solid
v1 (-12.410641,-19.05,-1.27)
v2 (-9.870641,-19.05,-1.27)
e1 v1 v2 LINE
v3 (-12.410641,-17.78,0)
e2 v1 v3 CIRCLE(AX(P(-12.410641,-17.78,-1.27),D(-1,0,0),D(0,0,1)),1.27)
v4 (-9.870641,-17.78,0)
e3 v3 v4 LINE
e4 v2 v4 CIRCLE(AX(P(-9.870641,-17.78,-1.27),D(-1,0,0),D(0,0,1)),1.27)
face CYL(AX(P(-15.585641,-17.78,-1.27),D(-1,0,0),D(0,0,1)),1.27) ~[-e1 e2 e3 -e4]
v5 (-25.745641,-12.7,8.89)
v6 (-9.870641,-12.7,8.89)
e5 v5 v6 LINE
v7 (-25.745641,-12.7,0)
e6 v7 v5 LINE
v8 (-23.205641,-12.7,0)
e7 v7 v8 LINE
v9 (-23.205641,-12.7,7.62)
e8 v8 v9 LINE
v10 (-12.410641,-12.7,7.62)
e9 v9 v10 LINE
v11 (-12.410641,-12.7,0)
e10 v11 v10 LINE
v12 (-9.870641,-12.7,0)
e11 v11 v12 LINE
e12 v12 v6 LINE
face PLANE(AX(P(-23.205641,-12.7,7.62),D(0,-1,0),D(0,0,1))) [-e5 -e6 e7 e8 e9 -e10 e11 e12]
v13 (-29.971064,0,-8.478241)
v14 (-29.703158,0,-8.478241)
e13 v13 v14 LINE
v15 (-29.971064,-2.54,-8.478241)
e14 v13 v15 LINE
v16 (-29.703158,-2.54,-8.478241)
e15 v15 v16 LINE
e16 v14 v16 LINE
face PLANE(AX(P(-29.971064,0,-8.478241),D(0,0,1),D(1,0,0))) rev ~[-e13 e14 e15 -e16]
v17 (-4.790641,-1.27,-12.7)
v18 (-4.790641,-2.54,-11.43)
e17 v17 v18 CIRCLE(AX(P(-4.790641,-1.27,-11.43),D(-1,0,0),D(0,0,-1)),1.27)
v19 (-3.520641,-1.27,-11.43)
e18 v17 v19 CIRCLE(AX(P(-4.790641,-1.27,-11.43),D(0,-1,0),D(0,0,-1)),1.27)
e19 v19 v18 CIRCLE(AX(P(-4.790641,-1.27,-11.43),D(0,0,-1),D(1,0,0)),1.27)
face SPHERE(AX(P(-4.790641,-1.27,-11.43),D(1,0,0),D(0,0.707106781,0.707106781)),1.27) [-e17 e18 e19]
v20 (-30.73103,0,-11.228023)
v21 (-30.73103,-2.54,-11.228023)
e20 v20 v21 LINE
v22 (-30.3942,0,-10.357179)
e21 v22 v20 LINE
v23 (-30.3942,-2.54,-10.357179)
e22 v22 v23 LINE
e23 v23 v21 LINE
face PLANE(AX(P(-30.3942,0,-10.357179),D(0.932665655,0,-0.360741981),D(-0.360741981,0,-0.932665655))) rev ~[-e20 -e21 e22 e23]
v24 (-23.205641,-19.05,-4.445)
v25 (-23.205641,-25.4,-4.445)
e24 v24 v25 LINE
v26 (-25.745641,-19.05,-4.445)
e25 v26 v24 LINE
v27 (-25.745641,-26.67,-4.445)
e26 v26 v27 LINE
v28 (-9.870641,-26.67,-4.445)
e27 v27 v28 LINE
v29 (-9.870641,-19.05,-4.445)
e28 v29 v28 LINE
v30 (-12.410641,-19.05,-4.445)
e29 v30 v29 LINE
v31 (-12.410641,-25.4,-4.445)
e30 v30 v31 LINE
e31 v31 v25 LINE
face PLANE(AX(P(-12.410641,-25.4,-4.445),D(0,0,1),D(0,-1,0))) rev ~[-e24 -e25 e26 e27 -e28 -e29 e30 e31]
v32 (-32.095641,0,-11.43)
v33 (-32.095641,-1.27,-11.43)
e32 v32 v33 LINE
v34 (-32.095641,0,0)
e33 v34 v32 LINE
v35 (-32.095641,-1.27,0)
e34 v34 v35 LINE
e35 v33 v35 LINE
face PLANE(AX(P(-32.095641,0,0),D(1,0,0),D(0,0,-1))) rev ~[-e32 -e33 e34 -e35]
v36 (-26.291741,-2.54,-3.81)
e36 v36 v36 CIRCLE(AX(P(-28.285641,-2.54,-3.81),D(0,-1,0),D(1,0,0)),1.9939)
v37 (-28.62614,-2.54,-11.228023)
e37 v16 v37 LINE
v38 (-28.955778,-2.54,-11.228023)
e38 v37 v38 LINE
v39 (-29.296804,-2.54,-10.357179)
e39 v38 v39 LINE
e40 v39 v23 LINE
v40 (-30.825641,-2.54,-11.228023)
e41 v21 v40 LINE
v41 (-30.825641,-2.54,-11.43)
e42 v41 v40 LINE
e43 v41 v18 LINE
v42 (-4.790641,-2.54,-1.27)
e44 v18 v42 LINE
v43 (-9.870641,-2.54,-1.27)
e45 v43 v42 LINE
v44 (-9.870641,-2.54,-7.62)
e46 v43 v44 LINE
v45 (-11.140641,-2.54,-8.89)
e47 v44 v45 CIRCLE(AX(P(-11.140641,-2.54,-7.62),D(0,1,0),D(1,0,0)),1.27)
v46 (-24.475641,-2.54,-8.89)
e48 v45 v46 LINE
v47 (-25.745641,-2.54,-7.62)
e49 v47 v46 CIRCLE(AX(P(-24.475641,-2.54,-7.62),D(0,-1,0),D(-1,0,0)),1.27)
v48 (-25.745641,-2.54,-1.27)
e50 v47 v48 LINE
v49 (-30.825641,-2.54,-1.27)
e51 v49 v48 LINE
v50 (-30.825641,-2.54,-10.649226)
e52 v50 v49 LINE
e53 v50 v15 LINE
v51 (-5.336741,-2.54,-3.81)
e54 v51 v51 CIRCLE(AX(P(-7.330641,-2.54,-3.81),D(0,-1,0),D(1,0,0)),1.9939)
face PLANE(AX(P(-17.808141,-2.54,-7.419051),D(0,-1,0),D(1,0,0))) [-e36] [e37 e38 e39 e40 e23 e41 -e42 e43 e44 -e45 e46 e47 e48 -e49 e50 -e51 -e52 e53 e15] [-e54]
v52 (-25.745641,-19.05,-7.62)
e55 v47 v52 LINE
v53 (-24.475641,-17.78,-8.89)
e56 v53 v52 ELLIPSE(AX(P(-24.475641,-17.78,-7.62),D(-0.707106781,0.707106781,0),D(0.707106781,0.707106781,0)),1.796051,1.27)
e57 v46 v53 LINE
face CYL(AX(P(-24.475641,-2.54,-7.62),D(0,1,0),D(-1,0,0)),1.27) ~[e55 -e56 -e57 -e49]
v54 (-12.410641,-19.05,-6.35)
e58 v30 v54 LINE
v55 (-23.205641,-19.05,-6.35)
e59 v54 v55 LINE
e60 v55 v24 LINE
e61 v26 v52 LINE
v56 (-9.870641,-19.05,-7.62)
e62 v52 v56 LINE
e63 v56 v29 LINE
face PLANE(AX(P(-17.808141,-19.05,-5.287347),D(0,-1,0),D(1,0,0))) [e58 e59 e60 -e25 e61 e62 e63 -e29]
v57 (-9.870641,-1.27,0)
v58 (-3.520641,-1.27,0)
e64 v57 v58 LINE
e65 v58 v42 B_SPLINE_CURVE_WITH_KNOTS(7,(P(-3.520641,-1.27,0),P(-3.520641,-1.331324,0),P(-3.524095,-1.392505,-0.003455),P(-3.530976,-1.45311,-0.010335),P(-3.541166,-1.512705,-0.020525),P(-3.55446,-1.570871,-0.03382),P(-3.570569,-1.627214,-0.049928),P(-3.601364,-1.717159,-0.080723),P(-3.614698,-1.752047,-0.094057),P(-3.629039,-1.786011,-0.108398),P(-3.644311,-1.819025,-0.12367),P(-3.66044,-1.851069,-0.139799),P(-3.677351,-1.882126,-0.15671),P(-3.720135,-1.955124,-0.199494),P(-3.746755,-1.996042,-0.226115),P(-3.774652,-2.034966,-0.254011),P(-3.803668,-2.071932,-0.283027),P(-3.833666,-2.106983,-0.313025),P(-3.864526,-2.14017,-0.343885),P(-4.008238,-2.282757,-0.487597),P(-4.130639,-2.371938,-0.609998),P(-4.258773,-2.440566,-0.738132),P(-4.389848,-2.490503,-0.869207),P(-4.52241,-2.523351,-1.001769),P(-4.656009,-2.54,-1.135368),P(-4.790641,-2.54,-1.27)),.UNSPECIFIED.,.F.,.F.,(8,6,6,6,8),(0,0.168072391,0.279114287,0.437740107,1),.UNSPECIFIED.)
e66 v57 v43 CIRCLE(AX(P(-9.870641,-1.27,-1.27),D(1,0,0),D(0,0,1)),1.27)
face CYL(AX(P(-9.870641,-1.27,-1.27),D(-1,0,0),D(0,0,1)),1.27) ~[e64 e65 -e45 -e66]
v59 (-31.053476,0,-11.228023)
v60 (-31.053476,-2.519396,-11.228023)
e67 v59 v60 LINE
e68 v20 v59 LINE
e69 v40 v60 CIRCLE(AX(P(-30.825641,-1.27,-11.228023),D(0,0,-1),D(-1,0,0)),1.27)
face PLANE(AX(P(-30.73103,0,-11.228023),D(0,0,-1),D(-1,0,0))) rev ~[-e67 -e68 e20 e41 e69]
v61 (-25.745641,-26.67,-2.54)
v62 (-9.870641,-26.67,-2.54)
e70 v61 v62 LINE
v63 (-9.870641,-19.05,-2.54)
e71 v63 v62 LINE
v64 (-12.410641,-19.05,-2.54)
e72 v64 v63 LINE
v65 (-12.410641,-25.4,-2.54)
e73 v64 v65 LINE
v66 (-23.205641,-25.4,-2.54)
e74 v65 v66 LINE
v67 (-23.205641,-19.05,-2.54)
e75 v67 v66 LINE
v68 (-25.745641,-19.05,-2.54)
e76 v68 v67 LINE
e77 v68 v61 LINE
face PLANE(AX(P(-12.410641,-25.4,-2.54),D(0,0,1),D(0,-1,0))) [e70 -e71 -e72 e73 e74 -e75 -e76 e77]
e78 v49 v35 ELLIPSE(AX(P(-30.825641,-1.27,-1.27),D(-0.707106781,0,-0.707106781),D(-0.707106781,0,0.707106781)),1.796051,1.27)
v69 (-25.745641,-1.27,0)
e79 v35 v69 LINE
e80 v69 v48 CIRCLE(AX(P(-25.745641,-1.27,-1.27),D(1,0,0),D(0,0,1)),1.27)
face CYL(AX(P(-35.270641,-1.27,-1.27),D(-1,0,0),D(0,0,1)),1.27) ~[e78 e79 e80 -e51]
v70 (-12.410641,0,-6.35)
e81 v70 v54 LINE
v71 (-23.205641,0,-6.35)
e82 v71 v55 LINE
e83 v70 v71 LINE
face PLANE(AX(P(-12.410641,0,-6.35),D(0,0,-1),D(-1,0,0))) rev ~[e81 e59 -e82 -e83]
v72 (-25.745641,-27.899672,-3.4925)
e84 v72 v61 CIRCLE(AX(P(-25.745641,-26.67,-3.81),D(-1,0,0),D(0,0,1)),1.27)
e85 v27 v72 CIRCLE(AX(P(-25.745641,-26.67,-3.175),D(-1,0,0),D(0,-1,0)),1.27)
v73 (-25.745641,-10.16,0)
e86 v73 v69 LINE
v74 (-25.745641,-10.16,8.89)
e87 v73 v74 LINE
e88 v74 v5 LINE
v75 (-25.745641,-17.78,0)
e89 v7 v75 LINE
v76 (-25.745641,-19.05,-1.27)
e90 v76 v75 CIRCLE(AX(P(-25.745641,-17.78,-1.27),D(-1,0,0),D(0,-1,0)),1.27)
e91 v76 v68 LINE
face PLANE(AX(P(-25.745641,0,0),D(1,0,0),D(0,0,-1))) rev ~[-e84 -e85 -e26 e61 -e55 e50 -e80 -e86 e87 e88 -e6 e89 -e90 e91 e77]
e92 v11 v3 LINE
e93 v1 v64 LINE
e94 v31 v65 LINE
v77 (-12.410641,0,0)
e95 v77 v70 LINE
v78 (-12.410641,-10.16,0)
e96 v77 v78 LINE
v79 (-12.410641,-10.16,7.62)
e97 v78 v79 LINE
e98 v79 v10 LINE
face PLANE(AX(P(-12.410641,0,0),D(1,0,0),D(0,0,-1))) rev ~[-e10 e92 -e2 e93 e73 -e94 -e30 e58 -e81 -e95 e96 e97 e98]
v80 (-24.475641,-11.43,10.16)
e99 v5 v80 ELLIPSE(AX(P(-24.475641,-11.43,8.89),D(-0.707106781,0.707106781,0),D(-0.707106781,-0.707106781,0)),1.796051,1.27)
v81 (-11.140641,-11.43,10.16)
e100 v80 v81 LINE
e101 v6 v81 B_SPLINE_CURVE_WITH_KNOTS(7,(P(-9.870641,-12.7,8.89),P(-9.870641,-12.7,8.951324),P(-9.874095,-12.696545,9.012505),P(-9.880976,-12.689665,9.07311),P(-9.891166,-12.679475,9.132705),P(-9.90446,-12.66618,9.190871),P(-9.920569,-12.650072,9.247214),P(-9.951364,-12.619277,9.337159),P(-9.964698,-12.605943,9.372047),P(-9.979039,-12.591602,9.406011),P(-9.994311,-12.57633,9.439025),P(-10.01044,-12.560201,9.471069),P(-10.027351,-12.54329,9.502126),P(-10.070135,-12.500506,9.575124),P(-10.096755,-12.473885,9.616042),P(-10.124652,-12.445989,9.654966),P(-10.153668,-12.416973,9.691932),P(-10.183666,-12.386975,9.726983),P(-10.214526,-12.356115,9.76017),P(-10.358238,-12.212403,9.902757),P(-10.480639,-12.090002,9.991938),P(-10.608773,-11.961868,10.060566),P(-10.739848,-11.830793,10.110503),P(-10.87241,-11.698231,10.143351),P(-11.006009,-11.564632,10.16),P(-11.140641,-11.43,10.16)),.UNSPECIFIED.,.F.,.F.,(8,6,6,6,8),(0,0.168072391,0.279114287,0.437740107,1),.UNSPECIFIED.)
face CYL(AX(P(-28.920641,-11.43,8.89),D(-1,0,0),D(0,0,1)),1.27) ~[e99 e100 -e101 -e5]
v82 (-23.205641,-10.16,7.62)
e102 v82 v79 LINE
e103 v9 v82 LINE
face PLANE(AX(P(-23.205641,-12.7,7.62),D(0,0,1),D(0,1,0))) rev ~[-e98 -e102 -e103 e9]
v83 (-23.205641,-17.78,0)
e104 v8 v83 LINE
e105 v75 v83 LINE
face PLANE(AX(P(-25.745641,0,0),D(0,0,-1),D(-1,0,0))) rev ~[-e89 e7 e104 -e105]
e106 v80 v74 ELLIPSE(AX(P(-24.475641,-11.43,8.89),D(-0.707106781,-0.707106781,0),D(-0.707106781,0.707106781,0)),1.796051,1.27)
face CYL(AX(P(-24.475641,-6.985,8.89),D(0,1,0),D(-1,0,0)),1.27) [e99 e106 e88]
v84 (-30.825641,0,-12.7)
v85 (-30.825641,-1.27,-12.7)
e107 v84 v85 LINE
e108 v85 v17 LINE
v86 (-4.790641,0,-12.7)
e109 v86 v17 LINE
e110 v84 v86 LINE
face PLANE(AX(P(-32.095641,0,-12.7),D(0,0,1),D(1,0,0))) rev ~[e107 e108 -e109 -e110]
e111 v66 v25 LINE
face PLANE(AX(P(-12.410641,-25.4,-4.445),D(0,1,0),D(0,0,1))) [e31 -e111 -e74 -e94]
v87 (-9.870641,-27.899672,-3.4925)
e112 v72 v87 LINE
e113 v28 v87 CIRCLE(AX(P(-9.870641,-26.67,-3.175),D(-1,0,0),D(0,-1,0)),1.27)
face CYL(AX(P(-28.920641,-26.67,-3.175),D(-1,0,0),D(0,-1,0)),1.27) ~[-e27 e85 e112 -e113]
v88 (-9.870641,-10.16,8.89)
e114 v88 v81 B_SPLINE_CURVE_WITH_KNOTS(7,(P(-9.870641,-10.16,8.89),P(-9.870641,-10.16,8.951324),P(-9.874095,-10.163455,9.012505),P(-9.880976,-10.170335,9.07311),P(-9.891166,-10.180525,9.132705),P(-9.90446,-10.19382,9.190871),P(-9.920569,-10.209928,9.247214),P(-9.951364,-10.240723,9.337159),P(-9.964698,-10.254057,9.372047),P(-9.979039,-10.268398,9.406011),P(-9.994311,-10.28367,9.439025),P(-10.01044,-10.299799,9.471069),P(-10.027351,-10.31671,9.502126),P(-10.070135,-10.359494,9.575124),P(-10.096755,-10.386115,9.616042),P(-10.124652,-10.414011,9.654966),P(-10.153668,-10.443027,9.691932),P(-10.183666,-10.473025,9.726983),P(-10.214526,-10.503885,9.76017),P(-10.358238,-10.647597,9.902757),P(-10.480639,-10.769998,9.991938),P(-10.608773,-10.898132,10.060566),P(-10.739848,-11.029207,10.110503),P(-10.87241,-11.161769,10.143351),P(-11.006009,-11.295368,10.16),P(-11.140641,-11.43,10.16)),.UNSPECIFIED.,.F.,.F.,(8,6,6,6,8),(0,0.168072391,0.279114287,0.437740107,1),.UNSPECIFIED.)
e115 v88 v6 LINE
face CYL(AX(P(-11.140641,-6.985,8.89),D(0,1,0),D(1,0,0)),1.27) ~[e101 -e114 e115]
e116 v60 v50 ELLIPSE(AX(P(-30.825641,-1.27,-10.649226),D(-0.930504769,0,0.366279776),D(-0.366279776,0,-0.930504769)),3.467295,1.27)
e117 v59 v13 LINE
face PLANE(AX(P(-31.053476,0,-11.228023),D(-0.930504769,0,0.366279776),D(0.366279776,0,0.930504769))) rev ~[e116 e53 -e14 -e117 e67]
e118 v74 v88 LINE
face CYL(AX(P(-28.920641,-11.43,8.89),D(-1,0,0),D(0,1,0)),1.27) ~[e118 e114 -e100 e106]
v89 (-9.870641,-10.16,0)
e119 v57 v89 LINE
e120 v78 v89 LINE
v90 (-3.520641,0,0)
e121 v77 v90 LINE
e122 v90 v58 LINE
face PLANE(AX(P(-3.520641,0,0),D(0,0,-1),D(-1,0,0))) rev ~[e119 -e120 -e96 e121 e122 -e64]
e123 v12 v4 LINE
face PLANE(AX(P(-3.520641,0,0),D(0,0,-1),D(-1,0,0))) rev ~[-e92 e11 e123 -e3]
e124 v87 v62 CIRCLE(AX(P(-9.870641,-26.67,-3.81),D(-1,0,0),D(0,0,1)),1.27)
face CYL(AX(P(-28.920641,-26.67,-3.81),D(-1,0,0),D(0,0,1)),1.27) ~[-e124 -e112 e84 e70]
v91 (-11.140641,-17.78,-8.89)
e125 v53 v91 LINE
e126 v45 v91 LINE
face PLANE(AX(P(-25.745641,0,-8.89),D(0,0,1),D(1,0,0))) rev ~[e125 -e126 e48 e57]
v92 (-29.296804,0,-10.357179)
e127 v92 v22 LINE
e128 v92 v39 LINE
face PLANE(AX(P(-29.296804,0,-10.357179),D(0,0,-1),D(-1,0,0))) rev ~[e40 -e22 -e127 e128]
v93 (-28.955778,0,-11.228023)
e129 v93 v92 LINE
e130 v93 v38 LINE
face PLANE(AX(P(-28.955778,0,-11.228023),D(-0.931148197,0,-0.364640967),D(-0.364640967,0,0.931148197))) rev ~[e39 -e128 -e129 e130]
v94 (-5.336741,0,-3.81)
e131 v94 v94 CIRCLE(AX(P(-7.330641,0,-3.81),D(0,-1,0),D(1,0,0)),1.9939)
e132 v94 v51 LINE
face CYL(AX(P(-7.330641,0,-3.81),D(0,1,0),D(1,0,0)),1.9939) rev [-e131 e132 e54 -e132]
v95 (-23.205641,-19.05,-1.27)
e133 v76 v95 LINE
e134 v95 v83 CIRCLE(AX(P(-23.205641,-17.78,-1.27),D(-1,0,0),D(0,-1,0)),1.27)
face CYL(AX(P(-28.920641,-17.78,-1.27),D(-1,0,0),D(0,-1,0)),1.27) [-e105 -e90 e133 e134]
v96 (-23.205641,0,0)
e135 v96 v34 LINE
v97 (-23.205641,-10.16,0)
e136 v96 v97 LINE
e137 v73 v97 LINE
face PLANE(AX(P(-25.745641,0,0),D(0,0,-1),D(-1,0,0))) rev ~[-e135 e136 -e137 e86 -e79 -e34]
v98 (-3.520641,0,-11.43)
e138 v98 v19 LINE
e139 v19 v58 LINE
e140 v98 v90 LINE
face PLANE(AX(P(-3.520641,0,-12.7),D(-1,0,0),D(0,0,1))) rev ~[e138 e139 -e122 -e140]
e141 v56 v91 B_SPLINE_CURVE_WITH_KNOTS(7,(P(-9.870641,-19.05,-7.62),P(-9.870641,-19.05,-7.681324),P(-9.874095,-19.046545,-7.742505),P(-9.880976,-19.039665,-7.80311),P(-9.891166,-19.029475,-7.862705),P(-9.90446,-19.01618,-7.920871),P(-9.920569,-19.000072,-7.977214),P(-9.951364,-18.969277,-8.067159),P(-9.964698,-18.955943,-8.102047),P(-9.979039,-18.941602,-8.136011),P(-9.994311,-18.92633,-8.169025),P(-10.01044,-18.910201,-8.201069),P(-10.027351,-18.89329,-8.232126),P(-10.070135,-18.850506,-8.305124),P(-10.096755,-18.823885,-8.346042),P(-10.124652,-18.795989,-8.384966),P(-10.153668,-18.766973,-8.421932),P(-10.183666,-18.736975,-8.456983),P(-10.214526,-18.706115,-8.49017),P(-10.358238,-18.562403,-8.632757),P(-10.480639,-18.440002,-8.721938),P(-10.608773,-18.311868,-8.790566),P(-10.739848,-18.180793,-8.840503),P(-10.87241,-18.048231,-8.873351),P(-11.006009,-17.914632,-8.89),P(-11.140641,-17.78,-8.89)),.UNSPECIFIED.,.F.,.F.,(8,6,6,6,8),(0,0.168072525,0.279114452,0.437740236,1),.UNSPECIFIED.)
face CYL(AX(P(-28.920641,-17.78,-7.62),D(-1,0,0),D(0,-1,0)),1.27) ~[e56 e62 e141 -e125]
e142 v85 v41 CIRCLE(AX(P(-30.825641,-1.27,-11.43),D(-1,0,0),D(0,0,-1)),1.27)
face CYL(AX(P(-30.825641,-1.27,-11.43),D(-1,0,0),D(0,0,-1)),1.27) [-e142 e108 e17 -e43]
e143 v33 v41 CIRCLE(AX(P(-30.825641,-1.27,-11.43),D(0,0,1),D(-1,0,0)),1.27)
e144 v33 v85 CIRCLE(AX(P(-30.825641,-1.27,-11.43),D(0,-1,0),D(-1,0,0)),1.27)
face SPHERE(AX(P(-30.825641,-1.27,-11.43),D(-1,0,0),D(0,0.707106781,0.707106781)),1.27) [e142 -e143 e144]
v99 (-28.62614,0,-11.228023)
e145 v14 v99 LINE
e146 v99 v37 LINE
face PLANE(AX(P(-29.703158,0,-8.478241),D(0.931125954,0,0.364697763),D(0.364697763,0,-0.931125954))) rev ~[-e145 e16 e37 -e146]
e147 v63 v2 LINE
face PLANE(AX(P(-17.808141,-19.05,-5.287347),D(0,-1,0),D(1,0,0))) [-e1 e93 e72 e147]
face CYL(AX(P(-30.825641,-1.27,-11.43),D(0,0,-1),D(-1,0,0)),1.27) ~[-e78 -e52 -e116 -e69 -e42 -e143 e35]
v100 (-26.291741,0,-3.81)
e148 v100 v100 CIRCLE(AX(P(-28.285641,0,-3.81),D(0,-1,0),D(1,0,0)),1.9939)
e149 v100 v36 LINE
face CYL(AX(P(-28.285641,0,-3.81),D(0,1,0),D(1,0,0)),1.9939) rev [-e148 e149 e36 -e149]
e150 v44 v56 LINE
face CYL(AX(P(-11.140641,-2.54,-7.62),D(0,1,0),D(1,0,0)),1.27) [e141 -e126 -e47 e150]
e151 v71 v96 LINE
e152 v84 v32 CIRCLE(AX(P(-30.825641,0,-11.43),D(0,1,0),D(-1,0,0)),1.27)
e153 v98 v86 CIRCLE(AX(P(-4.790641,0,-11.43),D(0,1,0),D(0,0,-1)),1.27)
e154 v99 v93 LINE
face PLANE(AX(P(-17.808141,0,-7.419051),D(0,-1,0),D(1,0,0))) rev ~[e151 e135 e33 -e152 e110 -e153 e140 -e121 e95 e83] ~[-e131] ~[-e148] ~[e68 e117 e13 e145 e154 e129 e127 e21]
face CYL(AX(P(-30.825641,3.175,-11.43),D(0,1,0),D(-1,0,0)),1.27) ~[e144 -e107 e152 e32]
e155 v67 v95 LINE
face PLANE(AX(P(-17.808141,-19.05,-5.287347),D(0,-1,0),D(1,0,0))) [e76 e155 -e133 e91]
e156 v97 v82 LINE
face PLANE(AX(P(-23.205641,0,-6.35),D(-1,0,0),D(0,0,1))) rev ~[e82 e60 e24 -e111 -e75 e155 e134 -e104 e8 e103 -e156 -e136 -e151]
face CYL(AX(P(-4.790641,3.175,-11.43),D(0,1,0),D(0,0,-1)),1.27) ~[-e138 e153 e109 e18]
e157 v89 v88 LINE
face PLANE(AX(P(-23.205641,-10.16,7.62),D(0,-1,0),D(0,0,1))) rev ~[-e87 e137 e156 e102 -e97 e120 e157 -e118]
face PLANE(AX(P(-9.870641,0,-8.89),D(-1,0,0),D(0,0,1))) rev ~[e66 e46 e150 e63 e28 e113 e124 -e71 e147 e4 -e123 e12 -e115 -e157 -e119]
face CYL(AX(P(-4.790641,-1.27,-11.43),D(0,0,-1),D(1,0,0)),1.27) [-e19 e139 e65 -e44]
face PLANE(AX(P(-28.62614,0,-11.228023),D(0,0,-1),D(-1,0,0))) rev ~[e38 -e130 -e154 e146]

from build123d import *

# Parameters (mm, degrees)
F1_DEPTH      = 19.05
F0_R          = 1.9939
F2_DEPTH      = 2.54
F3_W          = 2.54
F3_H          = 1.905
F4_DEPTH      = 8.89
F5_W          = 2.54
F5_H          = 1.905
F6_DEPTH      = 11.43
F7_W          = 2.54
F7_H          = 2.54
F8_W          = 2.54
F8_H          = 2.54
F9_DEPTH      = 10.16
F10_W         = 2.54
F10_H         = 2.54
F11_DEPTH     = 11.43
F12_T1_DEPTH  = 9.525
F12_T3_DEPTH  = 14.605
F12_T5_DEPTH  = 26.035
F12_T7_DEPTH  = 9.525
F12_T9_DEPTH  = 4.445
F12_T11_DEPTH = 19.685
F12_T13_DEPTH = 22.225
F12_T15_DEPTH = 8.89
F12_T17_DEPTH = 8.89
F12_T19_DEPTH = 8.89
F12_S23_W     = 1.27
F12_S23_H     = 1.27
F12_T24_DEPTH = 1.27
F12_S29_W     = 1.27
F12_S29_H     = 1.27
F12_T30_DEPTH = 1.27


# Not quite as in the source:
# - a fillet or chamfer that OpenCascade refuses, or shapes differently, is made with other operations: its cross-section is extruded or revolved along the edge and cut away or added


with BuildPart() as f1:
    # F0 (on Front) → F1 (new body)
    with BuildSketch(Plane.XZ):
        Polygon((-23.2056408978, -6.35), (-23.2056408978, 0), (-25.7456408978, 0), (-25.7456408978, -8.89), (-9.8706408978, -8.89), (-9.8706408978, 0), (-12.4106408978, 0), (-12.4106408978, -6.35), align=None)
    extrude(amount=F1_DEPTH)

    # F0 (on Front) → F2 (join)
    with BuildSketch(Plane.XZ):
        Polygon((-25.7456408978, -8.89), (-25.7456408978, 0), (-32.0956408978, 0), (-32.0956408978, -12.7), (-3.5206408978, -12.7), (-3.5206408978, 0), (-9.8706408978, 0), (-9.8706408978, -8.89), align=None)
        Polygon((-28.6261399051, -11.2280230969), (-28.955778145, -11.2280230969), (-29.2968038878, -10.3571788012), (-30.3941995557, -10.3571788012), (-30.7310299027, -11.2280230969), (-31.0534760356, -11.2280230969), (-29.9710639241, -8.4782408335), (-29.7031579363, -8.4782408335), align=None, mode=Mode.SUBTRACT)
        with Locations((-28.2856408978, -3.81)):
            Circle(F0_R, mode=Mode.SUBTRACT)
        with Locations((-7.3306408978, -3.81)):
            Circle(F0_R, mode=Mode.SUBTRACT)
    extrude(amount=F2_DEPTH)

    # F3 (on face) → F4 (join)
    with BuildSketch(Plane.XZ.offset(19.05)):
        with Locations((-11.1406408978, -3.4925)):
            Rectangle(F3_W, F3_H)
        with Locations((-24.4756408978, -3.4925)):
            Rectangle(F3_W, F3_H)
    extrude(amount=F4_DEPTH)

    # F5 (on face) → F6 (join)
    with BuildSketch(Plane(origin=(-12.4106408978, 0, 0), x_dir=(0, -1, 0), z_dir=(-1, 0, 0))):
        with Locations((26.67, -3.4925)):
            Rectangle(F5_W, F5_H)
    extrude(amount=F6_DEPTH)

    # F7 (on face) + F8 (on face) → F9 (join)
    with BuildSketch(Plane.XY):
        with Locations((-24.4756408978, -11.43)):
            Rectangle(F7_W, F7_H)
    with BuildSketch(Plane.XY):
        with Locations((-11.1406408978, -11.43)):
            Rectangle(F8_W, F8_H)
    extrude(amount=F9_DEPTH)

    # F10 (on face) → F11 (join)
    with BuildSketch(Plane.YZ.offset(-23.2056408978)):
        with Locations((-11.43, 8.89)):
            Rectangle(F10_W, F10_H)
    extrude(amount=F11_DEPTH)

    # F12: fillet of radius 1.27 on 18 edges, made by hand

    # F12_s2 → F12_t1 (cut)
    with BuildSketch(Plane.YZ.offset(-35.2706408978)):
        with BuildLine():
            ThreePointArc((-1.27, 0), (-2.1680256121, -0.3719743879), (-2.54, -1.27))
            Line((-2.54, -1.27), (-2.54, 0))
            Line((-2.54, 0), (-1.27, 0))
        make_face()
    extrude(amount=F12_T1_DEPTH, mode=Mode.SUBTRACT)

    # F12_s4 → F12_t3 (cut)
    with BuildSketch(Plane.XY.offset(-11.43)):
        with BuildLine():
            ThreePointArc((-32.0956408978, -1.27), (-31.7236665099, -2.1680256121), (-30.8256408978, -2.54))
            Line((-30.8256408978, -2.54), (-32.0956408978, -2.54))
            Line((-32.0956408978, -2.54), (-32.0956408978, -1.27))
        make_face()
        with BuildLine():
            ThreePointArc((-3.5206408978, -1.27), (-3.8926152856, -2.1680256121), (-4.7906408978, -2.54))
            Line((-4.7906408978, -2.54), (-3.5206408978, -2.54))
            Line((-3.5206408978, -2.54), (-3.5206408978, -1.27))
        make_face()
    extrude(amount=F12_T3_DEPTH, mode=Mode.SUBTRACT)

    # F12_s6 → F12_t5 (cut)
    with BuildSketch(Plane.YZ.offset(-30.8256408978)):
        with BuildLine():
            ThreePointArc((-1.27, -12.7), (-2.1680256121, -12.3280256121), (-2.54, -11.43))
            Line((-2.54, -11.43), (-2.54, -12.7))
            Line((-2.54, -12.7), (-1.27, -12.7))
        make_face()
    extrude(amount=F12_T5_DEPTH, mode=Mode.SUBTRACT)

    # F12_s8 → F12_t7 (cut)
    with BuildSketch(Plane.YZ.offset(-9.8706408978)):
        with BuildLine():
            ThreePointArc((-1.27, 0), (-2.1680256121, -0.3719743879), (-2.54, -1.27))
            Line((-2.54, -1.27), (-2.54, 0))
            Line((-2.54, 0), (-1.27, 0))
        make_face()
    extrude(amount=F12_T7_DEPTH, mode=Mode.SUBTRACT)

    # F12_s10 → F12_t9 (cut)
    with BuildSketch(Plane.XZ.offset(-3.175)):
        with BuildLine():
            ThreePointArc((-4.7906408978, -12.7), (-3.8926152856, -12.3280256121), (-3.5206408978, -11.43))
            Line((-3.5206408978, -11.43), (-3.5206408978, -12.7))
            Line((-3.5206408978, -12.7), (-4.7906408978, -12.7))
        make_face()
        with BuildLine():
            ThreePointArc((-32.0956408978, -11.43), (-31.7236665099, -12.3280256121), (-30.8256408978, -12.7))
            Line((-30.8256408978, -12.7), (-32.0956408978, -12.7))
            Line((-32.0956408978, -12.7), (-32.0956408978, -11.43))
        make_face()
    extrude(amount=F12_T9_DEPTH, mode=Mode.SUBTRACT)

    # F12_s12 → F12_t11 (cut)
    with BuildSketch(Plane.XZ.offset(2.54)):
        with BuildLine():
            ThreePointArc((-9.8706408978, -7.62), (-10.2426152856, -8.5180256121), (-11.1406408978, -8.89))
            Line((-11.1406408978, -8.89), (-9.8706408978, -8.89))
            Line((-9.8706408978, -8.89), (-9.8706408978, -7.62))
        make_face()
        with BuildLine():
            ThreePointArc((-25.7456408978, -7.62), (-25.3736665099, -8.5180256121), (-24.4756408978, -8.89))
            Line((-24.4756408978, -8.89), (-25.7456408978, -8.89))
            Line((-25.7456408978, -8.89), (-25.7456408978, -7.62))
        make_face()
    extrude(amount=F12_T11_DEPTH, mode=Mode.SUBTRACT)

    # F12_s14 → F12_t13 (cut)
    with BuildSketch(Plane.YZ.offset(-28.9206408978)):
        with BuildLine():
            ThreePointArc((-26.67, -2.54), (-27.5680256121, -2.9119743879), (-27.94, -3.81))
            Line((-27.94, -3.81), (-27.94, -2.54))
            Line((-27.94, -2.54), (-26.67, -2.54))
        make_face()
        with BuildLine():
            ThreePointArc((-19.05, -7.62), (-18.6780256121, -8.5180256121), (-17.78, -8.89))
            Line((-17.78, -8.89), (-19.05, -8.89))
            Line((-19.05, -8.89), (-19.05, -7.62))
        make_face()
        with BuildLine():
            ThreePointArc((-27.94, -3.175), (-27.5680256121, -4.0730256121), (-26.67, -4.445))
            Line((-26.67, -4.445), (-27.94, -4.445))
            Line((-27.94, -4.445), (-27.94, -3.175))
        make_face()
        with BuildLine():
            ThreePointArc((-11.43, 10.16), (-12.3280256121, 9.7880256121), (-12.7, 8.89))
            Line((-12.7, 8.89), (-12.7, 10.16))
            Line((-12.7, 10.16), (-11.43, 10.16))
        make_face()
        with BuildLine():
            ThreePointArc((-10.16, 8.89), (-10.5319743879, 9.7880256121), (-11.43, 10.16))
            Line((-11.43, 10.16), (-10.16, 10.16))
            Line((-10.16, 10.16), (-10.16, 8.89))
        make_face()
    extrude(amount=F12_T13_DEPTH, mode=Mode.SUBTRACT)

    # F12_s16 → F12_t15 (cut)
    with BuildSketch(Plane.YZ.offset(-28.9206408978)):
        with BuildLine():
            ThreePointArc((-19.05, -1.27), (-18.6780256121, -0.3719743879), (-17.78, 0))
            Line((-17.78, 0), (-19.05, 0))
            Line((-19.05, 0), (-19.05, -1.27))
        make_face()
    extrude(amount=F12_T15_DEPTH, mode=Mode.SUBTRACT)

    # F12_s18 → F12_t17 (cut)
    with BuildSketch(Plane.YZ.offset(-15.5856408978)):
        with BuildLine():
            ThreePointArc((-17.78, 0), (-18.6780256121, -0.3719743879), (-19.05, -1.27))
            Line((-19.05, -1.27), (-19.05, 0))
            Line((-19.05, 0), (-17.78, 0))
        make_face()
    extrude(amount=F12_T17_DEPTH, mode=Mode.SUBTRACT)

    # F12_s20 → F12_t19 (cut)
    with BuildSketch(Plane.XZ.offset(6.985)):
        with BuildLine():
            ThreePointArc((-25.7456408978, 8.89), (-25.3736665099, 9.7880256121), (-24.4756408978, 10.16))
            Line((-24.4756408978, 10.16), (-25.7456408978, 10.16))
            Line((-25.7456408978, 10.16), (-25.7456408978, 8.89))
        make_face()
        with BuildLine():
            ThreePointArc((-9.8706408978, 8.89), (-10.2426152856, 9.7880256121), (-11.1406408978, 10.16))
            Line((-11.1406408978, 10.16), (-9.8706408978, 10.16))
            Line((-9.8706408978, 10.16), (-9.8706408978, 8.89))
        make_face()
    extrude(amount=F12_T19_DEPTH, mode=Mode.SUBTRACT)


with BuildPart() as f12_tool22:
    # F12_s23 → F12_t24 (new body)
    with BuildSketch(Plane.YZ.offset(-30.8256408978)):
        with Locations((-1.905, -12.065)):
            Rectangle(F12_S23_W, F12_S23_H)
    extrude(amount=-F12_T24_DEPTH)

    # F12_s25 → F12_t26 (revolve, cut)
    with BuildSketch(Plane(origin=(-30.8256408978, -1.27, -11.43), x_dir=(0, 0.7071067812, 0.7071067812), z_dir=(0, -0.7071067812, 0.7071067812))):
        with BuildLine():
            ThreePointArc((0, -1.27), (1.27, 0), (0, 1.27))
            Line((0, 1.27), (0, -1.27))
        make_face()
    revolve(axis=Axis((-30.8256408978, -1.27, -11.43), (-1, 0, 0)), mode=Mode.SUBTRACT)


with BuildPart() as f1_1:
    add(f1.part)

    # F12_t21: cut F12_tool22
    add(f12_tool22.part, mode=Mode.SUBTRACT)


with BuildPart() as f12_tool28:
    # F12_s29 → F12_t30 (new body)
    with BuildSketch(Plane.YZ.offset(-4.7906408978)):
        with Locations((-1.905, -12.065)):
            Rectangle(F12_S29_W, F12_S29_H)
    extrude(amount=F12_T30_DEPTH)

    # F12_s31 → F12_t32 (revolve, cut)
    with BuildSketch(Plane(origin=(-4.7906408978, -1.27, -11.43), x_dir=(0, 0.7071067812, 0.7071067812), z_dir=(0, 0.7071067812, -0.7071067812))):
        with BuildLine():
            ThreePointArc((0, -1.27), (1.27, 0), (0, 1.27))
            Line((0, 1.27), (0, -1.27))
        make_face()
    revolve(axis=Axis((-4.7906408978, -1.27, -11.43), (1, 0, 0)), mode=Mode.SUBTRACT)


with BuildPart() as f1_2:
    add(f1_1.part)

    # F12_t27: cut F12_tool28
    add(f12_tool28.part, mode=Mode.SUBTRACT)


solid = f1_2.part
